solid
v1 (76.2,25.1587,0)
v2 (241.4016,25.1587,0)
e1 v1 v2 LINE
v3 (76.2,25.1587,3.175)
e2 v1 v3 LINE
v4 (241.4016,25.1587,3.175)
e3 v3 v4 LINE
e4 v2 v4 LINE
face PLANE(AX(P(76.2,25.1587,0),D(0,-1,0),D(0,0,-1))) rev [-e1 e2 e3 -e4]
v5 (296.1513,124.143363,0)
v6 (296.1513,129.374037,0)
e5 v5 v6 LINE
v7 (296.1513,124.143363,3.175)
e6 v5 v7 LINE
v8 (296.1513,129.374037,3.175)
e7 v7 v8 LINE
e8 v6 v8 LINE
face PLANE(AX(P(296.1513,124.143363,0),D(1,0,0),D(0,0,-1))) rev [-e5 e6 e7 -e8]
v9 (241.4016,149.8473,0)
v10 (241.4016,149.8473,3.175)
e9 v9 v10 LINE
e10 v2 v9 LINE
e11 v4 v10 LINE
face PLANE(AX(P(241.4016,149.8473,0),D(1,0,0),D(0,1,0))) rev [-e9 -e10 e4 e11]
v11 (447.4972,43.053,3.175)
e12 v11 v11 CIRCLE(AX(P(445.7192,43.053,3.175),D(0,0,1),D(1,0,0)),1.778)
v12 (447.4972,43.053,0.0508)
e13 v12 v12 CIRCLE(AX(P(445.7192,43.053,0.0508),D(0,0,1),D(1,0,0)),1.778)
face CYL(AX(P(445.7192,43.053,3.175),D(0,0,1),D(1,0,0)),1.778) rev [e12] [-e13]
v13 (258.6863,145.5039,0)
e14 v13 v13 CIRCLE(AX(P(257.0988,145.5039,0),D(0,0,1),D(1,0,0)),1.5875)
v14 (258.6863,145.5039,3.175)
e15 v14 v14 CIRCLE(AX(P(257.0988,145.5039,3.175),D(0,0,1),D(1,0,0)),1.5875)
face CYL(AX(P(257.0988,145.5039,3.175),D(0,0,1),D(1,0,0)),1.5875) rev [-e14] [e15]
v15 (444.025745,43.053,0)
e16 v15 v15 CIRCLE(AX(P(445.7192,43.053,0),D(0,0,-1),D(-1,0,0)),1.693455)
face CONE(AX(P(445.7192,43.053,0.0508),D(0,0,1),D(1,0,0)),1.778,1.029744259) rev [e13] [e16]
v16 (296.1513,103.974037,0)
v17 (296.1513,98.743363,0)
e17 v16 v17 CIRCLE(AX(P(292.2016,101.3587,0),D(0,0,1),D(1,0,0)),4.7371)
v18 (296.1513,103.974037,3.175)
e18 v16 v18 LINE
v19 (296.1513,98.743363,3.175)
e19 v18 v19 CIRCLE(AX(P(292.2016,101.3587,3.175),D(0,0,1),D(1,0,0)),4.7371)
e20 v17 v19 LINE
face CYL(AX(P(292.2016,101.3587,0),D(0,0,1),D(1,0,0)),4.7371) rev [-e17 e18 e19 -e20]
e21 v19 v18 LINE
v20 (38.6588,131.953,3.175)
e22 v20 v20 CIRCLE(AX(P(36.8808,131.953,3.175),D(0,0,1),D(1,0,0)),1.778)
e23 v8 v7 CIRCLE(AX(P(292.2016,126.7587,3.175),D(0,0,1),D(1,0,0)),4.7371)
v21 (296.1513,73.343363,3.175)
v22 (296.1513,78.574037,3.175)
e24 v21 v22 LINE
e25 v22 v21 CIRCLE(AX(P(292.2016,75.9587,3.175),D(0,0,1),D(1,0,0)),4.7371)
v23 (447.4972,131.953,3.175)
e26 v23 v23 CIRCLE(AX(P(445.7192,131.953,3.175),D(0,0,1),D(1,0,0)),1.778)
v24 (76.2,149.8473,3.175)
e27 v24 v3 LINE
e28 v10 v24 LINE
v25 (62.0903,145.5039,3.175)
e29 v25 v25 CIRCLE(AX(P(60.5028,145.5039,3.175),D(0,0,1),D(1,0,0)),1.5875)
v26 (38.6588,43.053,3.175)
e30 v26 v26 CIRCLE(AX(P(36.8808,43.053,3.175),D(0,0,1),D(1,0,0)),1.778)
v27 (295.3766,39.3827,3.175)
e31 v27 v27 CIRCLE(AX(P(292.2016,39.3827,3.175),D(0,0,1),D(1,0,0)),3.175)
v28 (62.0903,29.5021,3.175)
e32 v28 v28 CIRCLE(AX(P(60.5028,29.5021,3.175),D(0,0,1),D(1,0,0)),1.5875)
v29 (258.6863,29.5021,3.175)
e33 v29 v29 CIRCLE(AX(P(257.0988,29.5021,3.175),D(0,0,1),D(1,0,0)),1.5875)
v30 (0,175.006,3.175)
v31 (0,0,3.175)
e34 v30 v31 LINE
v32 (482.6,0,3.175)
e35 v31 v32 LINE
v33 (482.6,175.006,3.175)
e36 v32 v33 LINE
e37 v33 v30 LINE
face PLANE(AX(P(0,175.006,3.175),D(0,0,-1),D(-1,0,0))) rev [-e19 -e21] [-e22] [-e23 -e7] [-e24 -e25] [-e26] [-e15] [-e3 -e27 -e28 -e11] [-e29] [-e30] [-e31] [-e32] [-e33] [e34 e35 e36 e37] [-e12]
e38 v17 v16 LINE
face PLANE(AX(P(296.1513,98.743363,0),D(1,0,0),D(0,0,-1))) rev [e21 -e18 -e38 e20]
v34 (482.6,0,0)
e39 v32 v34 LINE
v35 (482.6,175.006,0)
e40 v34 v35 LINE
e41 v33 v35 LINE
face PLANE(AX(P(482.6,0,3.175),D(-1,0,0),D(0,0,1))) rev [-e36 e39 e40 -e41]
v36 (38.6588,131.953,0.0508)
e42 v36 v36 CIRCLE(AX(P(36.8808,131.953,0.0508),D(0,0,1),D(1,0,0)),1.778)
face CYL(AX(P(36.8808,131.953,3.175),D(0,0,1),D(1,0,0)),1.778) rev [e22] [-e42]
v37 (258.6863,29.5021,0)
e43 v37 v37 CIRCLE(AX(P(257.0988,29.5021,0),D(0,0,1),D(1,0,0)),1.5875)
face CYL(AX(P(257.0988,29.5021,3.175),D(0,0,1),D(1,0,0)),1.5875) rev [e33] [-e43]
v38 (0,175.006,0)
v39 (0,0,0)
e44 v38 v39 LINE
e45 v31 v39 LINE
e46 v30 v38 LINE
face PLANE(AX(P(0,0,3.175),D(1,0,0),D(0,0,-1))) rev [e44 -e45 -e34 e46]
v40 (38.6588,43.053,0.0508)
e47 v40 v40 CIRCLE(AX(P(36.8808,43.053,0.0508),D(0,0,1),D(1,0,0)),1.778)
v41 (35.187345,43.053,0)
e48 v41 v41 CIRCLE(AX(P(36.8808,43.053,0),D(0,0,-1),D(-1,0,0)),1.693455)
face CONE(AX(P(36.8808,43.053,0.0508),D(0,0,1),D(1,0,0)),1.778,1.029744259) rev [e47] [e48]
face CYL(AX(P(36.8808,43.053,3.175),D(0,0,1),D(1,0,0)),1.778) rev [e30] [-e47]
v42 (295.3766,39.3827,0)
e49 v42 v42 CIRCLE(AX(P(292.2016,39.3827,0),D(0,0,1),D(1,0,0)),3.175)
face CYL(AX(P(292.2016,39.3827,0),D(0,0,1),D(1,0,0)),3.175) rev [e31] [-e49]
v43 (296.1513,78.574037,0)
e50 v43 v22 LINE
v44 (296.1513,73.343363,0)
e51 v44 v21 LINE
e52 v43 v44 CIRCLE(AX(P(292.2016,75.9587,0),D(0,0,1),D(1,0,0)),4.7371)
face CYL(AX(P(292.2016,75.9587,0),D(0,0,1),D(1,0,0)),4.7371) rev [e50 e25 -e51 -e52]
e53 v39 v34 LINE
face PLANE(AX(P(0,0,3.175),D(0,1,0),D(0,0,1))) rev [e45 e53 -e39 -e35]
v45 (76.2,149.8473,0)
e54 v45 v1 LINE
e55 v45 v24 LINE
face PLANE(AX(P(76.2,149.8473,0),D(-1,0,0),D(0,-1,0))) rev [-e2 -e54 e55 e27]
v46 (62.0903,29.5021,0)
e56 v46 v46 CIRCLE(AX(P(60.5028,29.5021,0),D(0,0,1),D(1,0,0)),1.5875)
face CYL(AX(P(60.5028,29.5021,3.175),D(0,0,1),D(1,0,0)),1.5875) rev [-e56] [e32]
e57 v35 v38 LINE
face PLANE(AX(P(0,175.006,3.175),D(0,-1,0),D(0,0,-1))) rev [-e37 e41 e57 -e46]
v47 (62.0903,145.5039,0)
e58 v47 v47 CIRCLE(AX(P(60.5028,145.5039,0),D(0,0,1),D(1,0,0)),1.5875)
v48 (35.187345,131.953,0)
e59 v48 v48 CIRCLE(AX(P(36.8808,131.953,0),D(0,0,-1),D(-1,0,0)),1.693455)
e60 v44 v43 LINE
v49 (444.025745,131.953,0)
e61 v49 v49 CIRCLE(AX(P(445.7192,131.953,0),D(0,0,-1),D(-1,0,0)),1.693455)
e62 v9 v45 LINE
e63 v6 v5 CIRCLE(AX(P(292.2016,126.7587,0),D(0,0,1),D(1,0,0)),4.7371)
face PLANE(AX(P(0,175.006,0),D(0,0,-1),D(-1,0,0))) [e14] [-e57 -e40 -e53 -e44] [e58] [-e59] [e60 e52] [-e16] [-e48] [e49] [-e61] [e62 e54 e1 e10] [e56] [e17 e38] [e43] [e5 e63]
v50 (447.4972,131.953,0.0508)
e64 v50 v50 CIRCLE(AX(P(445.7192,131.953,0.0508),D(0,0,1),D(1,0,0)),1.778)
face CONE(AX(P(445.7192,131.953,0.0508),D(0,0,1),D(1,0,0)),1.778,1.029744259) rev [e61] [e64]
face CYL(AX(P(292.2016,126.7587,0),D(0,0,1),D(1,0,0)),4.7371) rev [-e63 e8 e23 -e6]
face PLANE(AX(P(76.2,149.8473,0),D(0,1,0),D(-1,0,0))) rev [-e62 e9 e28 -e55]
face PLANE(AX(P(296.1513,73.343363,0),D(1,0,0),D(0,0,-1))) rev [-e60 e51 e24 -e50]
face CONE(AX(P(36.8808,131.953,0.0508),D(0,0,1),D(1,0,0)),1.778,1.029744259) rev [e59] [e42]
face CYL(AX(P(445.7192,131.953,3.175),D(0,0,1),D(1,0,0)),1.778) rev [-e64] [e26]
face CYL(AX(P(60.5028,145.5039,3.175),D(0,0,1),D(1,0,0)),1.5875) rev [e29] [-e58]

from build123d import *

# Parameters (mm, degrees)
SKETCH1_W                    = 482.6
SKETCH1_H                    = 175.006
BASE_FLANGE_DEPTH            = 3.175
SKETCH2_W                    = 165.2016
SKETCH2_H                    = 124.6886
CUT_EXTRUDE1_DEPTH           = 514.361413296
F_1_8_0_125_DIAMETER_HOLE1_D = 3.175
LPATTERN1_COUNT              = 2
LPATTERN1_PITCH              = 116.0018
LPATTERN1_COUNT_DIR2         = 2
LPATTERN1_PITCH_DIR2         = 196.596
CUT_EXTRUDE2_DEPTH           = 514.361413296
LPATTERN2_COUNT              = 3
LPATTERN2_PITCH              = 25.4
SKETCH5_R                    = 3.175
CUT_EXTRUDE3_DEPTH           = 514.361413296
LPATTERN3_COUNT              = 2
LPATTERN3_PITCH              = 408.8384
LPATTERN3_COUNT_DIR2         = 2
LPATTERN3_PITCH_DIR2         = 88.9


# Sheet-metal steps are written as plain solids
with BuildPart() as part:
    # Sketch1 → Base-Flange (new body)
    with BuildSketch(Plane.XY):
        with Locations((241.3, 87.503)):
            Rectangle(SKETCH1_W, SKETCH1_H)
    extrude(amount=BASE_FLANGE_DEPTH)

    # Sketch2 → Cut-Extrude1 (cut, through all)
    with BuildSketch(Plane.XY.offset(3.175)):
        with Locations((158.8008, 87.503)):
            Rectangle(SKETCH2_W, SKETCH2_H)
    extrude(amount=-CUT_EXTRUDE1_DEPTH, mode=Mode.SUBTRACT)

    # 1/8 (0.125) Diameter Hole1 (through all)
    with Locations(Plane(origin=(60.5028, 29.5021, 3.175), x_dir=(1, 0, 0), z_dir=(0, 0, 1))):
        with Locations((0, 0)):
            f_1_8_0_125_diameter_hole1 = Hole(F_1_8_0_125_DIAMETER_HOLE1_D / 2)

    # LPattern1: 1_8 _0.125_ Diameter Hole1 2 × 2
    with Locations(*[(j * LPATTERN1_PITCH_DIR2, i * LPATTERN1_PITCH, 0) for i in range(LPATTERN1_COUNT) for j in range(LPATTERN1_COUNT_DIR2) if (i, j) != (0, 0)]):
        add(f_1_8_0_125_diameter_hole1, mode=Mode.SUBTRACT)

    # Sketch4 → Cut-Extrude2 (cut, through all)
    with BuildSketch(Plane.XY.offset(3.175)):
        with BuildLine():
            Line((296.1513, 73.343363249), (296.1513, 78.574036751))
            ThreePointArc((296.1513, 78.574036751), (287.4645, 75.9587), (296.1513, 73.343363249))
        make_face()
    cut_extrude2 = extrude(amount=-CUT_EXTRUDE2_DEPTH, mode=Mode.SUBTRACT)

    # LPattern2: Cut-Extrude2 ×3
    with Locations(*[(0, i * LPATTERN2_PITCH, 0) for i in range(1, LPATTERN2_COUNT)]):
        add(cut_extrude2, mode=Mode.SUBTRACT)

    # Sketch5 → Cut-Extrude3 (cut, through all)
    with BuildSketch(Plane.XY.offset(3.175)):
        with Locations((292.2016, 39.3827)):
            Circle(SKETCH5_R)
    extrude(amount=-CUT_EXTRUDE3_DEPTH, mode=Mode.SUBTRACT)

    # Sketch6 → #40 (0.098) Diameter Hole1 (revolve, cut)
    with BuildSketch(Plane(origin=(36.8808, 43.053, 3.175), x_dir=(0, -1, 0), z_dir=(1, 0, 0))):
        Polygon((0, 0), (0, 4.192530181), (1.778, 3.1242), (1.778, 0), align=None)
    f_40_0_098_diameter_hole1 = revolve(axis=Axis((36.8808, 43.053, 9.525), (0, 0, -1)), mode=Mode.SUBTRACT)

    # LPattern3: 40 _0.098_ Diameter Hole1 2 × 2
    with Locations(*[(i * LPATTERN3_PITCH, j * LPATTERN3_PITCH_DIR2, 0) for i in range(LPATTERN3_COUNT) for j in range(LPATTERN3_COUNT_DIR2) if (i, j) != (0, 0)]):
        add(f_40_0_098_diameter_hole1, mode=Mode.SUBTRACT)


solid = part.part
